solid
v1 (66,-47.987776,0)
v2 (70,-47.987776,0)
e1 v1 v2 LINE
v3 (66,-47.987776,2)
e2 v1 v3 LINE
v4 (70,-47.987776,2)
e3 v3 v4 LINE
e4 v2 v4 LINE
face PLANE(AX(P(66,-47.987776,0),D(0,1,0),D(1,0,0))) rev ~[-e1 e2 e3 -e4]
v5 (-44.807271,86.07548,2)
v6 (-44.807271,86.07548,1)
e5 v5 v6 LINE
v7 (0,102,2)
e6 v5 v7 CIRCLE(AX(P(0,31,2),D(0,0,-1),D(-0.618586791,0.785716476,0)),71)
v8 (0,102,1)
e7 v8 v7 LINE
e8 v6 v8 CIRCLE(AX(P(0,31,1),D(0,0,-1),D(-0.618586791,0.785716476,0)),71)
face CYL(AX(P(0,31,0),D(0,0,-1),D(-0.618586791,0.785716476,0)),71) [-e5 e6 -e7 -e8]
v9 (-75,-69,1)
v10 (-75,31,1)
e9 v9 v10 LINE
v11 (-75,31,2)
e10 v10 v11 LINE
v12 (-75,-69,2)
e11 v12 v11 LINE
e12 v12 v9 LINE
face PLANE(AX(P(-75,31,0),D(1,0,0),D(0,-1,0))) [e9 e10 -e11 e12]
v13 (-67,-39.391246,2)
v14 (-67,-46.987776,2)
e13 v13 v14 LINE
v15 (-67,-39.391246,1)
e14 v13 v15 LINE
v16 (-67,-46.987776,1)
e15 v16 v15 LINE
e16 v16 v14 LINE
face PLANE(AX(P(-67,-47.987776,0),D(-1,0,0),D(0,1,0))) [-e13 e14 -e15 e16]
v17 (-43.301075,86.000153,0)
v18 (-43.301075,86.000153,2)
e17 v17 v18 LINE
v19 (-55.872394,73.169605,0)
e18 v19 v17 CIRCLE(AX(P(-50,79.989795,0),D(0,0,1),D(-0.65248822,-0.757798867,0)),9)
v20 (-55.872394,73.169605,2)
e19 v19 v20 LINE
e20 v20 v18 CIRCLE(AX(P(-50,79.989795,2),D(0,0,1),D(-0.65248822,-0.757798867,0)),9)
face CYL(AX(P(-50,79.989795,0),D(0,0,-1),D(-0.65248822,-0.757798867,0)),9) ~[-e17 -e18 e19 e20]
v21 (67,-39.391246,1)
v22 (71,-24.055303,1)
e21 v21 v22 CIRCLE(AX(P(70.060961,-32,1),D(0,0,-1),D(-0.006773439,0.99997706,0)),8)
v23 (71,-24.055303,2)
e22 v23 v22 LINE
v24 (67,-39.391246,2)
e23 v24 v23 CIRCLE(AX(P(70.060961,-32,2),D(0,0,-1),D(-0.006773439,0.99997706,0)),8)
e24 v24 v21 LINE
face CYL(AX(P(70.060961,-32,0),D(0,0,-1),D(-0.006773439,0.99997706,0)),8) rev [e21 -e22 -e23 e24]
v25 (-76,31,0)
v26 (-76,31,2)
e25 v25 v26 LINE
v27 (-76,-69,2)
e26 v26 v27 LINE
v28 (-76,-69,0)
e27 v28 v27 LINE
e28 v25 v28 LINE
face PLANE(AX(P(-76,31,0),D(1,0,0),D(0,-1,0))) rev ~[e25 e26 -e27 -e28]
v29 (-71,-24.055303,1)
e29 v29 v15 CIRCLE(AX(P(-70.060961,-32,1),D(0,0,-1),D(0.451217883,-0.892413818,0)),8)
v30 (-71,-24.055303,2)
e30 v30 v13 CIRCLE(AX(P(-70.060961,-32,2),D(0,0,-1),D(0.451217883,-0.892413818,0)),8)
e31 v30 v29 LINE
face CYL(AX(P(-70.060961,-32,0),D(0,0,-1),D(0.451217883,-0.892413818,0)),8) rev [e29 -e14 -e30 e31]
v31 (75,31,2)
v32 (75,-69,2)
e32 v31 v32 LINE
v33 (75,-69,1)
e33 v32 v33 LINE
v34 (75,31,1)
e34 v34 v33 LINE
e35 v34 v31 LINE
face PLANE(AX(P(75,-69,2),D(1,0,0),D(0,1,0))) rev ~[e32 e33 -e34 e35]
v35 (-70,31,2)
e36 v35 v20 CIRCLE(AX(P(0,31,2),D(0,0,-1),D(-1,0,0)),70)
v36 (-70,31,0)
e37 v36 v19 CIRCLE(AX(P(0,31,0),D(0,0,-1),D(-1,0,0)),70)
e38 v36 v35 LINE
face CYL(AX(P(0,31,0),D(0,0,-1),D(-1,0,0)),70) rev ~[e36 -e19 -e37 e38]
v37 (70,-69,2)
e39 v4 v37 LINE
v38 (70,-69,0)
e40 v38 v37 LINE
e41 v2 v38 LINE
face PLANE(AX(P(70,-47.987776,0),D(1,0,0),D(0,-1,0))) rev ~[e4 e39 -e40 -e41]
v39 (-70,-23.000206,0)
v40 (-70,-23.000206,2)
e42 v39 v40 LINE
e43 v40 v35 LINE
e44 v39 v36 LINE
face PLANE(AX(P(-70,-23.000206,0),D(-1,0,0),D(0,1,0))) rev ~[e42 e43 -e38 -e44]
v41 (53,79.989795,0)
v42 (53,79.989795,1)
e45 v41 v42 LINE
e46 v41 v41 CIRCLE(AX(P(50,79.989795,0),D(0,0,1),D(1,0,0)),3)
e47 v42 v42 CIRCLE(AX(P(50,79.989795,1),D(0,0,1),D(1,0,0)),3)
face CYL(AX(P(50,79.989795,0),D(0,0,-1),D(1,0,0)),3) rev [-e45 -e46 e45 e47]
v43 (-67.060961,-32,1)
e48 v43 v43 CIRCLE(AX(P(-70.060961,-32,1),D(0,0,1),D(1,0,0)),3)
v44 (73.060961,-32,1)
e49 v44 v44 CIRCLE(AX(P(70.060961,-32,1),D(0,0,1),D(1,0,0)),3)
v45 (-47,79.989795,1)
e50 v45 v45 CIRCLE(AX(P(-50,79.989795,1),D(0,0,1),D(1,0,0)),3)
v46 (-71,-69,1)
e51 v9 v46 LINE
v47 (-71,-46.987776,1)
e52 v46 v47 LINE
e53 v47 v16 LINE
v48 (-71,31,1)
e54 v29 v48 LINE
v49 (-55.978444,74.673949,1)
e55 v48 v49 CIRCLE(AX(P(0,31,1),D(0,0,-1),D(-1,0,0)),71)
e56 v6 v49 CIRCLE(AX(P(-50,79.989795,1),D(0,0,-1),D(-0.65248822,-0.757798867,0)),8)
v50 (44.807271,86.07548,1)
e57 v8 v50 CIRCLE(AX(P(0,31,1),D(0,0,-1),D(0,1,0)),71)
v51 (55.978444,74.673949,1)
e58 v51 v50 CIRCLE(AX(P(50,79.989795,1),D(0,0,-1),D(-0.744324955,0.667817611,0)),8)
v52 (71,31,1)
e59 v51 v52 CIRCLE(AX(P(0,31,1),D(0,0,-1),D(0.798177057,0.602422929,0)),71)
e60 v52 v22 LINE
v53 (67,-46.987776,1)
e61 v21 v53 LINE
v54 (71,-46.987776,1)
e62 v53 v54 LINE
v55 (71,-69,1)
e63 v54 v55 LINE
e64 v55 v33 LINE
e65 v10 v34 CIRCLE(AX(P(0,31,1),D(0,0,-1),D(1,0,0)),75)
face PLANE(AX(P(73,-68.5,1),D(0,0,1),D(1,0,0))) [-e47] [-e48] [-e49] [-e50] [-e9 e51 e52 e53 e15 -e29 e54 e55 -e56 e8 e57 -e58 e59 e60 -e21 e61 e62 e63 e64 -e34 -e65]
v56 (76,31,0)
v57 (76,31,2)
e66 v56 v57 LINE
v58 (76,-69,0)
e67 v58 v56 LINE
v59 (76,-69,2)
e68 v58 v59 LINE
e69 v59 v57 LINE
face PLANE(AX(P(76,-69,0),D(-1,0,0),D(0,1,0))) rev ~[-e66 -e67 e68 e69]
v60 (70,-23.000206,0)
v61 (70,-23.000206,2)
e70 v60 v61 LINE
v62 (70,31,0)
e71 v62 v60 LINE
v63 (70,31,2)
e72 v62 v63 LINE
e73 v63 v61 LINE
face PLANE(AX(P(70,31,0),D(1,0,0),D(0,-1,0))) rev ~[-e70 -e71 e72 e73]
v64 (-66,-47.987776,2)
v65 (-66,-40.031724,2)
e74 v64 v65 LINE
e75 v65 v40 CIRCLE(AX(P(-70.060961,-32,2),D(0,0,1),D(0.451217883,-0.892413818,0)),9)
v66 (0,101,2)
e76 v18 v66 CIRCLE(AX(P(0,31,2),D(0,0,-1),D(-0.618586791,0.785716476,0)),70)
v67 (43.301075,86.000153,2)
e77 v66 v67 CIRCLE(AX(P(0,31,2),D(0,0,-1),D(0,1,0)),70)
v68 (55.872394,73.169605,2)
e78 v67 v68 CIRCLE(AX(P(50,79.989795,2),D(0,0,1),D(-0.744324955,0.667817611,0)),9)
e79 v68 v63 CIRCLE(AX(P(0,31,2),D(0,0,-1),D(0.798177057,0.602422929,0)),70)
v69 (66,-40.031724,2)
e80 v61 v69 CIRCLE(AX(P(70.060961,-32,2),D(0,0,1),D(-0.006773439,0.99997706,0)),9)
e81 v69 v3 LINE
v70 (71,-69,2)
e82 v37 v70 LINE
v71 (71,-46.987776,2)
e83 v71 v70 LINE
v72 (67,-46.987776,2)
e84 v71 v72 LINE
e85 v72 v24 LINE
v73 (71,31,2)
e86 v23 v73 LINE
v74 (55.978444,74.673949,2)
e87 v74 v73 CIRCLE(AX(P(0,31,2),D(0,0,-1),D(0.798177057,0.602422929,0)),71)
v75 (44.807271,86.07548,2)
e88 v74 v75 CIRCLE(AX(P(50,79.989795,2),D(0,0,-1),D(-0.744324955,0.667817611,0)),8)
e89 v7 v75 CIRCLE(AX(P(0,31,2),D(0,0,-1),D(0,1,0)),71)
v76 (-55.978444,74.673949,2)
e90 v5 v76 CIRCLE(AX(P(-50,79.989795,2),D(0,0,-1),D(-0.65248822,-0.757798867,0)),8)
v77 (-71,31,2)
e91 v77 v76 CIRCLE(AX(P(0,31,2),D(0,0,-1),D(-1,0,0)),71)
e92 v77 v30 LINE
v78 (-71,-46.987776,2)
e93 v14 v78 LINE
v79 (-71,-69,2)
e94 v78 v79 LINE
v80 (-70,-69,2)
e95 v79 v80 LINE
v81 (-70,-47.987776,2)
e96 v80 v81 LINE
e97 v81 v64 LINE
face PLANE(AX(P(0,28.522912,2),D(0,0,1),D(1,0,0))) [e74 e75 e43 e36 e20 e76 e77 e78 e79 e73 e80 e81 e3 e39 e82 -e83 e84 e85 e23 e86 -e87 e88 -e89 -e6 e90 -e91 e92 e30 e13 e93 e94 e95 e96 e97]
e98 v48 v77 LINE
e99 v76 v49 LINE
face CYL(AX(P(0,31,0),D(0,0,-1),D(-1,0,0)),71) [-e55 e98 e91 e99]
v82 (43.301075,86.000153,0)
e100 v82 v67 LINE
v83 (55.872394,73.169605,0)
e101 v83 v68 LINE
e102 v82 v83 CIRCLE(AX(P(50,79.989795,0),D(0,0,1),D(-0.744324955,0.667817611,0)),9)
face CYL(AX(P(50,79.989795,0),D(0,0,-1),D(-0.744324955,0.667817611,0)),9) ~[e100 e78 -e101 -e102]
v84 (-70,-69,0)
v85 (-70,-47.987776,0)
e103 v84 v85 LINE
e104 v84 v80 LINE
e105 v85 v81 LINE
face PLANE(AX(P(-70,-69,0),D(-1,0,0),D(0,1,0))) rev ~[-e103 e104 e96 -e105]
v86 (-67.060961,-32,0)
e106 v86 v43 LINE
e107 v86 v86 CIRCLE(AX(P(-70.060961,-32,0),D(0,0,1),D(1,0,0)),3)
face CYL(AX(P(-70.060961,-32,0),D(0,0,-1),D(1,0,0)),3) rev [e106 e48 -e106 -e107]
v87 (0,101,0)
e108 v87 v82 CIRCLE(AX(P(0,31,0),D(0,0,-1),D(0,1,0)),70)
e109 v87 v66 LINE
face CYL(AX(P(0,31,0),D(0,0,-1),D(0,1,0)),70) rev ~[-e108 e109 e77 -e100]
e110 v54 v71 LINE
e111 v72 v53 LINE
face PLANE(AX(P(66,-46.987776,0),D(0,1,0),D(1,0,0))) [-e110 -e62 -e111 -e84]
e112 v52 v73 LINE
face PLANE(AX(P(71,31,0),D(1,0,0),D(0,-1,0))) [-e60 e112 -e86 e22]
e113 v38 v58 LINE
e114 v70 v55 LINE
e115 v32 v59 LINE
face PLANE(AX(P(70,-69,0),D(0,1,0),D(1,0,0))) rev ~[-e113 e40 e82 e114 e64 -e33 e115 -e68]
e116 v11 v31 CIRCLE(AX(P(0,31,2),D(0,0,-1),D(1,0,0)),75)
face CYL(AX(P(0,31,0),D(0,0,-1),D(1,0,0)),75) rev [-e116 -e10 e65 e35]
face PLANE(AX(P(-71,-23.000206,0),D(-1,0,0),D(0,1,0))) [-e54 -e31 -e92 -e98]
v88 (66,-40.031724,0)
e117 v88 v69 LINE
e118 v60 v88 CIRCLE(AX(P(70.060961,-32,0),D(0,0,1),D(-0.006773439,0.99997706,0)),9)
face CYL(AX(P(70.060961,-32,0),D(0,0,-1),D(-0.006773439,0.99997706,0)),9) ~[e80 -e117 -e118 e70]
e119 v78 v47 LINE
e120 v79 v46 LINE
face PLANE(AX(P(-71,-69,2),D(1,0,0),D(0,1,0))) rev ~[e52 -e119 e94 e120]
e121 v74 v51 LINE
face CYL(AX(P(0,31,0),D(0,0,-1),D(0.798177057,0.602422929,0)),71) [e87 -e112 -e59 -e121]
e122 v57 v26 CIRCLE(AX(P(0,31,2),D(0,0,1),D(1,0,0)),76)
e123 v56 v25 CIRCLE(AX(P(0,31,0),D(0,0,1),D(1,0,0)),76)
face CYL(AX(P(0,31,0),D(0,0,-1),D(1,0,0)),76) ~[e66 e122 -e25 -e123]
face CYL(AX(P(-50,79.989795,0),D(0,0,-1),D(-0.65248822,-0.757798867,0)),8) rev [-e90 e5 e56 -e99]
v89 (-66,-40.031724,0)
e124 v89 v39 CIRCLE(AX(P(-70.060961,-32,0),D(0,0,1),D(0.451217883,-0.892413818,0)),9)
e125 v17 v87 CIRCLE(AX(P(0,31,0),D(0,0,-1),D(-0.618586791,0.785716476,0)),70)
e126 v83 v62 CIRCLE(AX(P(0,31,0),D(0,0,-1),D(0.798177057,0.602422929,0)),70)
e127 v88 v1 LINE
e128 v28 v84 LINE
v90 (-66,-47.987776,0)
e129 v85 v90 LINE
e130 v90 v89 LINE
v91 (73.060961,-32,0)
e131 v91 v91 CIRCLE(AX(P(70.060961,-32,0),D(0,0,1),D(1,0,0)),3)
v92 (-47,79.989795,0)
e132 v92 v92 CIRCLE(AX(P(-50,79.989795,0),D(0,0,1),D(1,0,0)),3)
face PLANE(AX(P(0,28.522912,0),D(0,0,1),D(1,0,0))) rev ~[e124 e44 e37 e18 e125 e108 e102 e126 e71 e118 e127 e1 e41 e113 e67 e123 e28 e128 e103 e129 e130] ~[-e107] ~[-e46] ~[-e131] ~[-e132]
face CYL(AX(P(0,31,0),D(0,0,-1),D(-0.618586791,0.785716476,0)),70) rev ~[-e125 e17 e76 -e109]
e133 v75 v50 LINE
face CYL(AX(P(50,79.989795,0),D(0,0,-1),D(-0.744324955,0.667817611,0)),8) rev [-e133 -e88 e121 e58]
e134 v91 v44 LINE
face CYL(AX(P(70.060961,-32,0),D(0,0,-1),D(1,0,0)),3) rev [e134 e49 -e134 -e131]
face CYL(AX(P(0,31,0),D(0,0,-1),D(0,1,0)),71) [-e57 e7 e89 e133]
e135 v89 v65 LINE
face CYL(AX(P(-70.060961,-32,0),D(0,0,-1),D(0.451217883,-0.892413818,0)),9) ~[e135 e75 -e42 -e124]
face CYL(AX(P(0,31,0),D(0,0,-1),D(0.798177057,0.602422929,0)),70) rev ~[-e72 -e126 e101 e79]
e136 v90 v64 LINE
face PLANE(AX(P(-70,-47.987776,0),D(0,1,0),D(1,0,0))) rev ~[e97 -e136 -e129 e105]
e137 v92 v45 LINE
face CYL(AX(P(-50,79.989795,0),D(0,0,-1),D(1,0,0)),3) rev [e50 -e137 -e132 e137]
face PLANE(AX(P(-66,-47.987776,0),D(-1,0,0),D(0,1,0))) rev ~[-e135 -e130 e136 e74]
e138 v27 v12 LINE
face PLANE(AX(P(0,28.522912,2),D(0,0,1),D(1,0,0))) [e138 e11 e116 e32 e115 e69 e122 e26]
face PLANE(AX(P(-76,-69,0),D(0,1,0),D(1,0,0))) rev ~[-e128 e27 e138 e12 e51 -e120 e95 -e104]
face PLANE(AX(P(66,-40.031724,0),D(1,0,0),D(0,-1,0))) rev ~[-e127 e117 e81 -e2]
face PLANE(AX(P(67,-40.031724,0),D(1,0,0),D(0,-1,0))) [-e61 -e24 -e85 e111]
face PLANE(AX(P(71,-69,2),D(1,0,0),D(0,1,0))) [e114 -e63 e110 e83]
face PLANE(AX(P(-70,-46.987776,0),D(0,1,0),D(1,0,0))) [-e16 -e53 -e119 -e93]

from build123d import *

# Parameters (mm, degrees)
F0_R     = 3
F1_DEPTH = 2
F2_T     = -1
F4_W     = 4
F4_H     = 1
F4_R     = 4
F4_R_2   = 3
F5_DEPTH = 1


# Not quite as in the source:
# - a feature of the source that left no trace in its solid (it failed there, or was rolled back) is left out


with BuildPart() as f1:
    # F0 (on Top) → F1 (new body)
    with BuildSketch(Plane.XY):
        with BuildLine():
            ThreePointArc((76, 31), (0, 107), (-76, 31))
            Line((-76, 31), (-76, -31))
            Line((-76, -31), (-76, -69))
            Line((-76, -69), (-70, -69))
            Line((-70, -69), (-70, -47.9877756238))
            Line((-70, -47.9877756238), (-66, -47.9877756238))
            Line((-66, -47.9877756238), (-66, -40.0317243588))
            ThreePointArc((-66, -40.0317243588), (-61.2993566139, -29.9422610746), (-70, -23.00020646))
            Line((-70, -23.00020646), (-70, 31))
            ThreePointArc((-70, 31), (-66.3741952073, 53.2365962005), (-55.8723939833, 73.1696050559))
            ThreePointArc((-55.8723939833, 73.1696050559), (-43.5714285714, 73.6911069456), (-43.3010754044, 86.0001533527))
            ThreePointArc((-43.3010754044, 86.0001533527), (-22.9127613494, 97.1438233499), (0, 101))
            ThreePointArc((0, 101), (22.9127613494, 97.1438233499), (43.3010754044, 86.0001533527))
            ThreePointArc((43.3010754044, 86.0001533527), (43.5714285714, 73.6911069456), (55.8723939833, 73.1696050559))
            ThreePointArc((55.8723939833, 73.1696050559), (66.3741952073, 53.2365962005), (70, 31))
            Line((70, 31), (70, -23.00020646))
            ThreePointArc((70, -23.00020646), (61.2993566139, -29.9422610746), (66, -40.0317243588))
            Line((66, -40.0317243588), (66, -47.9877756238))
            Line((66, -47.9877756238), (70, -47.9877756238))
            Line((70, -47.9877756238), (70, -69))
            Line((70, -69), (76, -69))
            Line((76, -69), (76, -31))
            Line((76, -31), (76, 31))
        make_face()
        with Locations((-70.0609609485, -32)):
            Circle(F0_R, mode=Mode.SUBTRACT)
        with Locations((70.0609609485, -32)):
            Circle(F0_R, mode=Mode.SUBTRACT)
        with Locations((-50, 79.9897948557)):
            Circle(F0_R, mode=Mode.SUBTRACT)
        with Locations((50, 79.9897948557)):
            Circle(F0_R, mode=Mode.SUBTRACT)
    extrude(amount=F1_DEPTH)

    # F2
    f2_openings = [f1.faces().sort_by_distance(p)[0] for p in [
        (0, 104.674489, 2),
    ]]
    offset(amount=F2_T, openings=f2_openings, kind=Kind.INTERSECTION)

    # F4 (on face) → F5 (cut)
    with BuildSketch(Plane.XY.offset(2)):
        with Locations((73, -68.5)):
            Rectangle(F4_W, F4_H)
        with Locations((-73, -68.5)):
            Rectangle(F4_W, F4_H)
        with Locations((-70.0609609485, -32)):
            Circle(F4_R)
        with Locations((-70.0609609485, -32)):
            Circle(F4_R_2, mode=Mode.SUBTRACT)
        with Locations((70.0609609485, -32)):
            Circle(F4_R)
        with Locations((70.0609609485, -32)):
            Circle(F4_R_2, mode=Mode.SUBTRACT)
        with Locations((-50, 79.9897948557)):
            Circle(F4_R)
        with Locations((-50, 79.9897948557)):
            Circle(F4_R_2, mode=Mode.SUBTRACT)
        with Locations((50, 79.9897948557)):
            Circle(F4_R)
        with Locations((50, 79.9897948557)):
            Circle(F4_R_2, mode=Mode.SUBTRACT)
    extrude(amount=-F5_DEPTH, mode=Mode.SUBTRACT)


solid = f1.part
